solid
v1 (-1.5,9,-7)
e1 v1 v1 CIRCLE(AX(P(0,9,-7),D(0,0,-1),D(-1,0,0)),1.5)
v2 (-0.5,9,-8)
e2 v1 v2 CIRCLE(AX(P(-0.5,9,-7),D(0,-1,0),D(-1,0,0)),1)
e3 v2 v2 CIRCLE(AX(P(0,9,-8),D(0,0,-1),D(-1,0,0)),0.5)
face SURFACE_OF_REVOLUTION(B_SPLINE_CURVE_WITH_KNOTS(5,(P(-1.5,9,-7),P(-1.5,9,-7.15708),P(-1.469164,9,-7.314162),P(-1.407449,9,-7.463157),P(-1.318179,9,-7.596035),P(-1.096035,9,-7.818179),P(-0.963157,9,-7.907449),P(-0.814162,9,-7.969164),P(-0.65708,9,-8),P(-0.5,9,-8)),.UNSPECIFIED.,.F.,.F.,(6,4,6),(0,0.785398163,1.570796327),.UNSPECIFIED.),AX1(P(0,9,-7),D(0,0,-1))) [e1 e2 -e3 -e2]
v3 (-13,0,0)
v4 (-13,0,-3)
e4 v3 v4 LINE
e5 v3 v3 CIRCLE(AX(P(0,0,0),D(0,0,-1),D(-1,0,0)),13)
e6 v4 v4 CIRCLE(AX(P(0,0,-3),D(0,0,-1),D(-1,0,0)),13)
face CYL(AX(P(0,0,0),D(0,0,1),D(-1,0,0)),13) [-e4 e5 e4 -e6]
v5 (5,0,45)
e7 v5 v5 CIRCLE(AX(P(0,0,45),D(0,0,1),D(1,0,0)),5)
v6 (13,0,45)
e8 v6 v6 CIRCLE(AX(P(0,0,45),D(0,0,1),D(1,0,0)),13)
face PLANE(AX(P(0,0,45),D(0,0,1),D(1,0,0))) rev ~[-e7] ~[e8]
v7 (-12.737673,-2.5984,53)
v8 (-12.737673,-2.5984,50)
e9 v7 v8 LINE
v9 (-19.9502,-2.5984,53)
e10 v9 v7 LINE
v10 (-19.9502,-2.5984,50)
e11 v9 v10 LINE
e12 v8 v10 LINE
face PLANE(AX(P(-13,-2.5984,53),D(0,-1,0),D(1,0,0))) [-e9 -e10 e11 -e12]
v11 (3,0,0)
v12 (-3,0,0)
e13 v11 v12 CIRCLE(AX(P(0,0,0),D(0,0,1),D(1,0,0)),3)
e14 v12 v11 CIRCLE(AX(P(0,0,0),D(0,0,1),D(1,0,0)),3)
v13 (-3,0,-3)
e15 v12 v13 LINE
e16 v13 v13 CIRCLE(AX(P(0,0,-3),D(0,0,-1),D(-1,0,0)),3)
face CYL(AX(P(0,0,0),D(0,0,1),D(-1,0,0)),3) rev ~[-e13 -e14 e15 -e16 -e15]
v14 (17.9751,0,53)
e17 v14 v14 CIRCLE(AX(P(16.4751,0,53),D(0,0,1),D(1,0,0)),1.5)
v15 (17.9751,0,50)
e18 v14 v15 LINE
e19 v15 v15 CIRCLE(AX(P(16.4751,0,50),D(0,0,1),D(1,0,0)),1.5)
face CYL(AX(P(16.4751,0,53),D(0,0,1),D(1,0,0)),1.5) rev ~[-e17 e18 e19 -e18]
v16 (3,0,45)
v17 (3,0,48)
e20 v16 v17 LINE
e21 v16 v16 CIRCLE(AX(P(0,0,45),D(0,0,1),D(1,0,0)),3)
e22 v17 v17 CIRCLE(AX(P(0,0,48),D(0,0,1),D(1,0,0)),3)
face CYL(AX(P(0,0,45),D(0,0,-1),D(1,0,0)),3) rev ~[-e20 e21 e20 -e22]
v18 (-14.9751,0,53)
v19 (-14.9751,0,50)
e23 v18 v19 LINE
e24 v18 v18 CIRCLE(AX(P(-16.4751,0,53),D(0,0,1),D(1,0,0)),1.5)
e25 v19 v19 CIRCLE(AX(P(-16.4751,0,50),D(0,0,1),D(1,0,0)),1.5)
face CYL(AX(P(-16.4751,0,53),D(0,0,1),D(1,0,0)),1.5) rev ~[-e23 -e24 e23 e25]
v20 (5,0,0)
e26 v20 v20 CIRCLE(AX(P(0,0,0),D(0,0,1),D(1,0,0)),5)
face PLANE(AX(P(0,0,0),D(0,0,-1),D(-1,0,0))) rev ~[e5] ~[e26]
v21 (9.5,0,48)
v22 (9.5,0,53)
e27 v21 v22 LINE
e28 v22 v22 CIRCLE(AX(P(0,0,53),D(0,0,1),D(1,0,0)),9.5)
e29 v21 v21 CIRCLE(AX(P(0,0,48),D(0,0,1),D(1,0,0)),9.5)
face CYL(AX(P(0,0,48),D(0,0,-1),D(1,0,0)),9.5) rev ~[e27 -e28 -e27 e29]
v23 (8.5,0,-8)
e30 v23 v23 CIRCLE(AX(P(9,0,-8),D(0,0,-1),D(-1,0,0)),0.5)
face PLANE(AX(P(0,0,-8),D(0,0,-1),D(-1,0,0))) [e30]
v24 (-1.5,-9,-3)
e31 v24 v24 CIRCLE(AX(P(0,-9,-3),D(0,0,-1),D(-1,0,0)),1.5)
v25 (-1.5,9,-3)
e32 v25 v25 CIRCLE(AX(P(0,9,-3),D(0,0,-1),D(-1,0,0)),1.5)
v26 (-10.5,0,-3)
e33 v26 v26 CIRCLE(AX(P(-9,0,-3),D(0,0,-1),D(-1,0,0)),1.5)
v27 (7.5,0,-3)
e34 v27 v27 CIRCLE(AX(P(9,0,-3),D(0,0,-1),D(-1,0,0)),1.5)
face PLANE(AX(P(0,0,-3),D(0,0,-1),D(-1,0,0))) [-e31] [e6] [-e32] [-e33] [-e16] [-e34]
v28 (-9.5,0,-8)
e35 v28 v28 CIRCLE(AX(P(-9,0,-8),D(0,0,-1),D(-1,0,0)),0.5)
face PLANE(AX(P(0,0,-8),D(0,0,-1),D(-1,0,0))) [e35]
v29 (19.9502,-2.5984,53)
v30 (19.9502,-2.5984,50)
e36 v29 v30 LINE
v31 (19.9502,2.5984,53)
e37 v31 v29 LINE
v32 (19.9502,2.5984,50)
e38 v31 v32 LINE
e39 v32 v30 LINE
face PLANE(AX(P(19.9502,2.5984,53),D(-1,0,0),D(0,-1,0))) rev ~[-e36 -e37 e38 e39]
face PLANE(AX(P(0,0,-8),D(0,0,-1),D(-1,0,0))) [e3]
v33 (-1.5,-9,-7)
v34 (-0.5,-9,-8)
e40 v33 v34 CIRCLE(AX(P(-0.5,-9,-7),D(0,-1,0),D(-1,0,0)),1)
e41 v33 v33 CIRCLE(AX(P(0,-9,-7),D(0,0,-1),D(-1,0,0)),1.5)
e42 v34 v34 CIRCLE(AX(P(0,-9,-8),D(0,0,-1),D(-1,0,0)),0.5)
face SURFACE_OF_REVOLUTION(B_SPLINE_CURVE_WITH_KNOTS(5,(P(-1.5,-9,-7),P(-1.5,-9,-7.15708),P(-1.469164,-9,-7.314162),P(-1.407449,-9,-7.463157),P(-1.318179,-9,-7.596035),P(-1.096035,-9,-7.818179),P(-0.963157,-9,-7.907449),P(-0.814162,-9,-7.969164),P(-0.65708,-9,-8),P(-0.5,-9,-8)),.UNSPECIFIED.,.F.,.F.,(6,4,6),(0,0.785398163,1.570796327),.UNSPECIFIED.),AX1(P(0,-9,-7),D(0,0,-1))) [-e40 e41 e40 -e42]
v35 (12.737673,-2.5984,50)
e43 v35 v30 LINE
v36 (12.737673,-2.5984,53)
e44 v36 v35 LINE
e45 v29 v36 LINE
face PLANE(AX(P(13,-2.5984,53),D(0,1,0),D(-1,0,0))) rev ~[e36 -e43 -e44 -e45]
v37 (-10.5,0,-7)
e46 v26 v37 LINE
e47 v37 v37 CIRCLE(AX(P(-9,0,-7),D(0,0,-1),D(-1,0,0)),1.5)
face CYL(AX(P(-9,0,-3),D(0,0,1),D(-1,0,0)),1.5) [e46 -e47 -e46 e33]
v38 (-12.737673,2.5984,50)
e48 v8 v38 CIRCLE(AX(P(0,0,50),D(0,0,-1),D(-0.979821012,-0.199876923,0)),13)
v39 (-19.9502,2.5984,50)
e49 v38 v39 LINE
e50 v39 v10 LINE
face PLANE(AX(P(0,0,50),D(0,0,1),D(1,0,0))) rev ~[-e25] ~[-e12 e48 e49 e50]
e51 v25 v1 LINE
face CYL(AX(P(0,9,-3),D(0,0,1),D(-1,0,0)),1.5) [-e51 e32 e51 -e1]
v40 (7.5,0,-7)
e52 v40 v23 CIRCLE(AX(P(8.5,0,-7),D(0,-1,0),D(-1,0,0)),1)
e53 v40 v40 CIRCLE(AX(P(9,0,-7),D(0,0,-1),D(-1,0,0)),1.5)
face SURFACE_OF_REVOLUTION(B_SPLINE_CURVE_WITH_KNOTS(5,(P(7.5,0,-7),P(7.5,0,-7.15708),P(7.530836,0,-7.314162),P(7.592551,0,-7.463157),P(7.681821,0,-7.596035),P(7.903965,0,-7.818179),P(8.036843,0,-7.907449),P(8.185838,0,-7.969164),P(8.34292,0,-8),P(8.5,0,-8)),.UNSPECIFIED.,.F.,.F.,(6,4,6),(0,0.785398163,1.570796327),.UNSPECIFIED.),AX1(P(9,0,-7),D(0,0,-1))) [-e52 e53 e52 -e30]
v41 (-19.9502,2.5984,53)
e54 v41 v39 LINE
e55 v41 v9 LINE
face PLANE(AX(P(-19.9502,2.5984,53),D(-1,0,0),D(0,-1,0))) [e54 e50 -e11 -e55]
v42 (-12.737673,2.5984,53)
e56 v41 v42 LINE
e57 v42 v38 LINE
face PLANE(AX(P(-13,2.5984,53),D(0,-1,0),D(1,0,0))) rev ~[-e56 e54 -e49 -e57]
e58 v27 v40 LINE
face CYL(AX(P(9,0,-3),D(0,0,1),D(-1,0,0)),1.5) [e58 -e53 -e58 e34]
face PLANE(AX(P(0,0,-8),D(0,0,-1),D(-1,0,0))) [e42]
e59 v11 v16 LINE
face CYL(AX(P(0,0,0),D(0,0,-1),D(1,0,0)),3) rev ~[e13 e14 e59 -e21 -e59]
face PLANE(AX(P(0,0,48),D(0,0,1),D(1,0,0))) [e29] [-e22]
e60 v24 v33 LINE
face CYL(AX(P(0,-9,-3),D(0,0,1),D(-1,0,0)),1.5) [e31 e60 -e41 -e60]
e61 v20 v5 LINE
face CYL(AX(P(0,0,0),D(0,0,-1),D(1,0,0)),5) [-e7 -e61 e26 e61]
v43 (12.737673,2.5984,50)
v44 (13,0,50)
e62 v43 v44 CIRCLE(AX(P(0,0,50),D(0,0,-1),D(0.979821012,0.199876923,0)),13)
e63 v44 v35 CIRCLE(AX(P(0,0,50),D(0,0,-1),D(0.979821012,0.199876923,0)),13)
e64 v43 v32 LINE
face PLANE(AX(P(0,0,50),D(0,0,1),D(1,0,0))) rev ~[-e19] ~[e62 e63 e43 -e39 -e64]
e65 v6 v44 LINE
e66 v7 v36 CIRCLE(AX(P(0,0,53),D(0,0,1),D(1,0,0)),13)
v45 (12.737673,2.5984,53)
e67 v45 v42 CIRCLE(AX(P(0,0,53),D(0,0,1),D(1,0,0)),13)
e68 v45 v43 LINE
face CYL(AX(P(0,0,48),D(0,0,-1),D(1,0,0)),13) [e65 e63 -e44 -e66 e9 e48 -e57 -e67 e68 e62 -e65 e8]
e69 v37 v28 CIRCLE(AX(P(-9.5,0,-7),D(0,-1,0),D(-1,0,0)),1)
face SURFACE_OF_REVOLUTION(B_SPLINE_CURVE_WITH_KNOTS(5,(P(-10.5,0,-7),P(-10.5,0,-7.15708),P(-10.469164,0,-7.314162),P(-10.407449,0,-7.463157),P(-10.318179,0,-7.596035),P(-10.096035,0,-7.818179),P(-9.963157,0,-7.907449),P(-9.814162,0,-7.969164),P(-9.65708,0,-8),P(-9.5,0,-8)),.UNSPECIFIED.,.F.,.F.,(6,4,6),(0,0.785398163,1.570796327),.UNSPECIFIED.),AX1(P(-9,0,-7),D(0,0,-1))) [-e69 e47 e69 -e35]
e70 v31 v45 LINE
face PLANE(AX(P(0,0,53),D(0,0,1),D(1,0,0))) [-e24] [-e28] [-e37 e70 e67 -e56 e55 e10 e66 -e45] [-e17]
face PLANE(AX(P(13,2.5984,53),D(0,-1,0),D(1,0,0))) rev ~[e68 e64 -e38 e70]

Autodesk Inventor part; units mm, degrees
ref_plane "YZ Plane" through (0, 0, 0) normal (1, 0, 0) x (0, 1, 0)
ref_plane "XZ Plane" through (0, 0, 0) normal (0, 1, 0) x (-1, 0, 0)
ref_plane "XY Plane" through (0, 0, 0) normal (0, 0, 1) x (1, 0, 0)
sketch "Эскиз1" plane through (0, 0, 0) normal (0, 0, 1) x (1, 0, 0)
  circle A0 centre (0, 0) radius 3
  circle A1 centre (0, 0) radius 5
  dimension "d0" = 6
  dimension "d1" = 10
extrude "Выдавливание1" add sketch "Эскиз1" along normal blind 45
sketch "Эскиз2" plane through (0, 0, 0) normal (0, 0, -1) x (-1, 0, 0)
  circle A0 centre (0, 0) radius 13
  circle A1 centre (0, 0) radius 5 projected
  circle A2 centre (0, 0) radius 3 projected
  dimension "d4" = 26
extrude "Выдавливание2" add sketch "Эскиз2" along normal blind 3 contours A0 | A1
sketch "Эскиз3" plane through (0, 0, -3) normal (0, 0, -1) x (-1, 0, 0)
  circle A0 centre (0, 9) radius 1.5
  circle A1 centre (-9, 0) radius 1.5
  circle A2 centre (0, -9) radius 1.5
  circle A3 centre (9, 0) radius 1.5
  circle A4 centre (0, 0) radius 5 projected
  dimension "d7" = 3
  dimension "d8" = 3
  dimension "d10" = 3
  dimension "d23" = 3
  dimension "d24" = 9
  dimension "d25" = 9
  dimension "d26" = 9
  dimension "d27" = 9
extrude "Выдавливание3" add sketch "Эскиз3" along normal blind 5 contours A0 | A1 | A2 | A3
fillet "Сопряжение1" radius 1 4 edges at (1.5, 9, -8) (10.5, 0, -8) (1.5, -9, -8) (-7.5, 0, -8)
sketch "Эскиз4" plane through (0, 0, 45) normal (0, 0, 1) x (1, 0, 0)
  circle A0 centre (0, 9) radius 1.5 projected
  circle A1 centre (0, 0) radius 13 projected
  circle A2 centre (0, 0) radius 5 projected
  circle A3 centre (0, 0) radius 3 projected
  point P0 (-0.5792, 4.9663)
  point P1 (0.5792, 4.9663)
extrude "Выдавливание4" add sketch "Эскиз4" along normal blind 3 contours A0 | A1 | A2
sketch "Эскиз6" plane through (0, 0, 48) normal (0, 0, 1) x (1, 0, 0)
  circle A0 centre (0, 0) radius 9.5
  circle A1 centre (0, 0) radius 13 projected
  dimension "d19" = 19
extrude "Выдавливание6" add sketch "Эскиз6" along normal blind 5
sketch "Эскиз8" plane through (0, 0, 53) normal (0, 0, 1) x (1, 0, 0)
  circle A0 centre (-16.4751, 0) radius 1.5
  circle A1 centre (0, 9) radius 1.5
  arc A2 (1.4487, -9.3889) -> (-1.4487, -9.3889) centre (0, -9) ccw
  line L0 (0, 9) -> (0, -9)
  circle A3 centre (0, 0) radius 13
  circle A4 centre (0, 0) radius 9.5
  line L1 (-13, 2.5984) -> (-11.6906, 2.5984)
  line L2 (-13, -2.5984) -> (-12.3453, -2.5984)
  line L3 (-13, -2.5984) -> (-13, 2.5984)
  line L4 (-19.9502, -2.5984) -> (-13, -2.5984)
  line L5 (-19.9502, 2.5984) -> (-19.9502, -2.5984)
  line L6 (-19.9502, -2.5984) -> (-13, 2.5984) construction
  line L7 (-13, -2.5984) -> (-19.9502, 2.5984) construction
  line L8 (-13, 2.5984) -> (-19.9502, 2.5984)
  circle A5 centre (16.4751, 0) radius 1.5
  line L9 (13, 2.5984) -> (11.6906, 2.5984)
  line L10 (13, -2.5984) -> (12.3453, -2.5984)
  line L11 (13, -2.5984) -> (13, 2.5984)
  circle A6 centre (16.4751, 0) radius 1.5
  line L12 (19.9502, -2.5984) -> (13, -2.5984)
  line L13 (13, 2.5984) -> (19.9502, 2.5984)
  line L14 (19.9502, -2.5984) -> (13, 2.5984) construction
  line L15 (13, -2.5984) -> (19.9502, 2.5984) construction
  line L16 (19.9502, 2.5984) -> (19.9502, -2.5984)
  point P0 (12.7377, 2.5984)
  point P1 (12.7377, -2.5984)
  point P2 (-12.7377, -2.5984)
  point P3 (-12.7377, 2.5984)
  dimension "d30" = 3
extrude "Выдавливание7" add sketch "Эскиз8" against normal blind 3 contours L11 L10 A3 | L11 L13 L16 L12 | A3 L9 L11 | A3 L3 L1 | L2 L3 A3 | L3 L4 L5 L8
properties part number "вт1"
